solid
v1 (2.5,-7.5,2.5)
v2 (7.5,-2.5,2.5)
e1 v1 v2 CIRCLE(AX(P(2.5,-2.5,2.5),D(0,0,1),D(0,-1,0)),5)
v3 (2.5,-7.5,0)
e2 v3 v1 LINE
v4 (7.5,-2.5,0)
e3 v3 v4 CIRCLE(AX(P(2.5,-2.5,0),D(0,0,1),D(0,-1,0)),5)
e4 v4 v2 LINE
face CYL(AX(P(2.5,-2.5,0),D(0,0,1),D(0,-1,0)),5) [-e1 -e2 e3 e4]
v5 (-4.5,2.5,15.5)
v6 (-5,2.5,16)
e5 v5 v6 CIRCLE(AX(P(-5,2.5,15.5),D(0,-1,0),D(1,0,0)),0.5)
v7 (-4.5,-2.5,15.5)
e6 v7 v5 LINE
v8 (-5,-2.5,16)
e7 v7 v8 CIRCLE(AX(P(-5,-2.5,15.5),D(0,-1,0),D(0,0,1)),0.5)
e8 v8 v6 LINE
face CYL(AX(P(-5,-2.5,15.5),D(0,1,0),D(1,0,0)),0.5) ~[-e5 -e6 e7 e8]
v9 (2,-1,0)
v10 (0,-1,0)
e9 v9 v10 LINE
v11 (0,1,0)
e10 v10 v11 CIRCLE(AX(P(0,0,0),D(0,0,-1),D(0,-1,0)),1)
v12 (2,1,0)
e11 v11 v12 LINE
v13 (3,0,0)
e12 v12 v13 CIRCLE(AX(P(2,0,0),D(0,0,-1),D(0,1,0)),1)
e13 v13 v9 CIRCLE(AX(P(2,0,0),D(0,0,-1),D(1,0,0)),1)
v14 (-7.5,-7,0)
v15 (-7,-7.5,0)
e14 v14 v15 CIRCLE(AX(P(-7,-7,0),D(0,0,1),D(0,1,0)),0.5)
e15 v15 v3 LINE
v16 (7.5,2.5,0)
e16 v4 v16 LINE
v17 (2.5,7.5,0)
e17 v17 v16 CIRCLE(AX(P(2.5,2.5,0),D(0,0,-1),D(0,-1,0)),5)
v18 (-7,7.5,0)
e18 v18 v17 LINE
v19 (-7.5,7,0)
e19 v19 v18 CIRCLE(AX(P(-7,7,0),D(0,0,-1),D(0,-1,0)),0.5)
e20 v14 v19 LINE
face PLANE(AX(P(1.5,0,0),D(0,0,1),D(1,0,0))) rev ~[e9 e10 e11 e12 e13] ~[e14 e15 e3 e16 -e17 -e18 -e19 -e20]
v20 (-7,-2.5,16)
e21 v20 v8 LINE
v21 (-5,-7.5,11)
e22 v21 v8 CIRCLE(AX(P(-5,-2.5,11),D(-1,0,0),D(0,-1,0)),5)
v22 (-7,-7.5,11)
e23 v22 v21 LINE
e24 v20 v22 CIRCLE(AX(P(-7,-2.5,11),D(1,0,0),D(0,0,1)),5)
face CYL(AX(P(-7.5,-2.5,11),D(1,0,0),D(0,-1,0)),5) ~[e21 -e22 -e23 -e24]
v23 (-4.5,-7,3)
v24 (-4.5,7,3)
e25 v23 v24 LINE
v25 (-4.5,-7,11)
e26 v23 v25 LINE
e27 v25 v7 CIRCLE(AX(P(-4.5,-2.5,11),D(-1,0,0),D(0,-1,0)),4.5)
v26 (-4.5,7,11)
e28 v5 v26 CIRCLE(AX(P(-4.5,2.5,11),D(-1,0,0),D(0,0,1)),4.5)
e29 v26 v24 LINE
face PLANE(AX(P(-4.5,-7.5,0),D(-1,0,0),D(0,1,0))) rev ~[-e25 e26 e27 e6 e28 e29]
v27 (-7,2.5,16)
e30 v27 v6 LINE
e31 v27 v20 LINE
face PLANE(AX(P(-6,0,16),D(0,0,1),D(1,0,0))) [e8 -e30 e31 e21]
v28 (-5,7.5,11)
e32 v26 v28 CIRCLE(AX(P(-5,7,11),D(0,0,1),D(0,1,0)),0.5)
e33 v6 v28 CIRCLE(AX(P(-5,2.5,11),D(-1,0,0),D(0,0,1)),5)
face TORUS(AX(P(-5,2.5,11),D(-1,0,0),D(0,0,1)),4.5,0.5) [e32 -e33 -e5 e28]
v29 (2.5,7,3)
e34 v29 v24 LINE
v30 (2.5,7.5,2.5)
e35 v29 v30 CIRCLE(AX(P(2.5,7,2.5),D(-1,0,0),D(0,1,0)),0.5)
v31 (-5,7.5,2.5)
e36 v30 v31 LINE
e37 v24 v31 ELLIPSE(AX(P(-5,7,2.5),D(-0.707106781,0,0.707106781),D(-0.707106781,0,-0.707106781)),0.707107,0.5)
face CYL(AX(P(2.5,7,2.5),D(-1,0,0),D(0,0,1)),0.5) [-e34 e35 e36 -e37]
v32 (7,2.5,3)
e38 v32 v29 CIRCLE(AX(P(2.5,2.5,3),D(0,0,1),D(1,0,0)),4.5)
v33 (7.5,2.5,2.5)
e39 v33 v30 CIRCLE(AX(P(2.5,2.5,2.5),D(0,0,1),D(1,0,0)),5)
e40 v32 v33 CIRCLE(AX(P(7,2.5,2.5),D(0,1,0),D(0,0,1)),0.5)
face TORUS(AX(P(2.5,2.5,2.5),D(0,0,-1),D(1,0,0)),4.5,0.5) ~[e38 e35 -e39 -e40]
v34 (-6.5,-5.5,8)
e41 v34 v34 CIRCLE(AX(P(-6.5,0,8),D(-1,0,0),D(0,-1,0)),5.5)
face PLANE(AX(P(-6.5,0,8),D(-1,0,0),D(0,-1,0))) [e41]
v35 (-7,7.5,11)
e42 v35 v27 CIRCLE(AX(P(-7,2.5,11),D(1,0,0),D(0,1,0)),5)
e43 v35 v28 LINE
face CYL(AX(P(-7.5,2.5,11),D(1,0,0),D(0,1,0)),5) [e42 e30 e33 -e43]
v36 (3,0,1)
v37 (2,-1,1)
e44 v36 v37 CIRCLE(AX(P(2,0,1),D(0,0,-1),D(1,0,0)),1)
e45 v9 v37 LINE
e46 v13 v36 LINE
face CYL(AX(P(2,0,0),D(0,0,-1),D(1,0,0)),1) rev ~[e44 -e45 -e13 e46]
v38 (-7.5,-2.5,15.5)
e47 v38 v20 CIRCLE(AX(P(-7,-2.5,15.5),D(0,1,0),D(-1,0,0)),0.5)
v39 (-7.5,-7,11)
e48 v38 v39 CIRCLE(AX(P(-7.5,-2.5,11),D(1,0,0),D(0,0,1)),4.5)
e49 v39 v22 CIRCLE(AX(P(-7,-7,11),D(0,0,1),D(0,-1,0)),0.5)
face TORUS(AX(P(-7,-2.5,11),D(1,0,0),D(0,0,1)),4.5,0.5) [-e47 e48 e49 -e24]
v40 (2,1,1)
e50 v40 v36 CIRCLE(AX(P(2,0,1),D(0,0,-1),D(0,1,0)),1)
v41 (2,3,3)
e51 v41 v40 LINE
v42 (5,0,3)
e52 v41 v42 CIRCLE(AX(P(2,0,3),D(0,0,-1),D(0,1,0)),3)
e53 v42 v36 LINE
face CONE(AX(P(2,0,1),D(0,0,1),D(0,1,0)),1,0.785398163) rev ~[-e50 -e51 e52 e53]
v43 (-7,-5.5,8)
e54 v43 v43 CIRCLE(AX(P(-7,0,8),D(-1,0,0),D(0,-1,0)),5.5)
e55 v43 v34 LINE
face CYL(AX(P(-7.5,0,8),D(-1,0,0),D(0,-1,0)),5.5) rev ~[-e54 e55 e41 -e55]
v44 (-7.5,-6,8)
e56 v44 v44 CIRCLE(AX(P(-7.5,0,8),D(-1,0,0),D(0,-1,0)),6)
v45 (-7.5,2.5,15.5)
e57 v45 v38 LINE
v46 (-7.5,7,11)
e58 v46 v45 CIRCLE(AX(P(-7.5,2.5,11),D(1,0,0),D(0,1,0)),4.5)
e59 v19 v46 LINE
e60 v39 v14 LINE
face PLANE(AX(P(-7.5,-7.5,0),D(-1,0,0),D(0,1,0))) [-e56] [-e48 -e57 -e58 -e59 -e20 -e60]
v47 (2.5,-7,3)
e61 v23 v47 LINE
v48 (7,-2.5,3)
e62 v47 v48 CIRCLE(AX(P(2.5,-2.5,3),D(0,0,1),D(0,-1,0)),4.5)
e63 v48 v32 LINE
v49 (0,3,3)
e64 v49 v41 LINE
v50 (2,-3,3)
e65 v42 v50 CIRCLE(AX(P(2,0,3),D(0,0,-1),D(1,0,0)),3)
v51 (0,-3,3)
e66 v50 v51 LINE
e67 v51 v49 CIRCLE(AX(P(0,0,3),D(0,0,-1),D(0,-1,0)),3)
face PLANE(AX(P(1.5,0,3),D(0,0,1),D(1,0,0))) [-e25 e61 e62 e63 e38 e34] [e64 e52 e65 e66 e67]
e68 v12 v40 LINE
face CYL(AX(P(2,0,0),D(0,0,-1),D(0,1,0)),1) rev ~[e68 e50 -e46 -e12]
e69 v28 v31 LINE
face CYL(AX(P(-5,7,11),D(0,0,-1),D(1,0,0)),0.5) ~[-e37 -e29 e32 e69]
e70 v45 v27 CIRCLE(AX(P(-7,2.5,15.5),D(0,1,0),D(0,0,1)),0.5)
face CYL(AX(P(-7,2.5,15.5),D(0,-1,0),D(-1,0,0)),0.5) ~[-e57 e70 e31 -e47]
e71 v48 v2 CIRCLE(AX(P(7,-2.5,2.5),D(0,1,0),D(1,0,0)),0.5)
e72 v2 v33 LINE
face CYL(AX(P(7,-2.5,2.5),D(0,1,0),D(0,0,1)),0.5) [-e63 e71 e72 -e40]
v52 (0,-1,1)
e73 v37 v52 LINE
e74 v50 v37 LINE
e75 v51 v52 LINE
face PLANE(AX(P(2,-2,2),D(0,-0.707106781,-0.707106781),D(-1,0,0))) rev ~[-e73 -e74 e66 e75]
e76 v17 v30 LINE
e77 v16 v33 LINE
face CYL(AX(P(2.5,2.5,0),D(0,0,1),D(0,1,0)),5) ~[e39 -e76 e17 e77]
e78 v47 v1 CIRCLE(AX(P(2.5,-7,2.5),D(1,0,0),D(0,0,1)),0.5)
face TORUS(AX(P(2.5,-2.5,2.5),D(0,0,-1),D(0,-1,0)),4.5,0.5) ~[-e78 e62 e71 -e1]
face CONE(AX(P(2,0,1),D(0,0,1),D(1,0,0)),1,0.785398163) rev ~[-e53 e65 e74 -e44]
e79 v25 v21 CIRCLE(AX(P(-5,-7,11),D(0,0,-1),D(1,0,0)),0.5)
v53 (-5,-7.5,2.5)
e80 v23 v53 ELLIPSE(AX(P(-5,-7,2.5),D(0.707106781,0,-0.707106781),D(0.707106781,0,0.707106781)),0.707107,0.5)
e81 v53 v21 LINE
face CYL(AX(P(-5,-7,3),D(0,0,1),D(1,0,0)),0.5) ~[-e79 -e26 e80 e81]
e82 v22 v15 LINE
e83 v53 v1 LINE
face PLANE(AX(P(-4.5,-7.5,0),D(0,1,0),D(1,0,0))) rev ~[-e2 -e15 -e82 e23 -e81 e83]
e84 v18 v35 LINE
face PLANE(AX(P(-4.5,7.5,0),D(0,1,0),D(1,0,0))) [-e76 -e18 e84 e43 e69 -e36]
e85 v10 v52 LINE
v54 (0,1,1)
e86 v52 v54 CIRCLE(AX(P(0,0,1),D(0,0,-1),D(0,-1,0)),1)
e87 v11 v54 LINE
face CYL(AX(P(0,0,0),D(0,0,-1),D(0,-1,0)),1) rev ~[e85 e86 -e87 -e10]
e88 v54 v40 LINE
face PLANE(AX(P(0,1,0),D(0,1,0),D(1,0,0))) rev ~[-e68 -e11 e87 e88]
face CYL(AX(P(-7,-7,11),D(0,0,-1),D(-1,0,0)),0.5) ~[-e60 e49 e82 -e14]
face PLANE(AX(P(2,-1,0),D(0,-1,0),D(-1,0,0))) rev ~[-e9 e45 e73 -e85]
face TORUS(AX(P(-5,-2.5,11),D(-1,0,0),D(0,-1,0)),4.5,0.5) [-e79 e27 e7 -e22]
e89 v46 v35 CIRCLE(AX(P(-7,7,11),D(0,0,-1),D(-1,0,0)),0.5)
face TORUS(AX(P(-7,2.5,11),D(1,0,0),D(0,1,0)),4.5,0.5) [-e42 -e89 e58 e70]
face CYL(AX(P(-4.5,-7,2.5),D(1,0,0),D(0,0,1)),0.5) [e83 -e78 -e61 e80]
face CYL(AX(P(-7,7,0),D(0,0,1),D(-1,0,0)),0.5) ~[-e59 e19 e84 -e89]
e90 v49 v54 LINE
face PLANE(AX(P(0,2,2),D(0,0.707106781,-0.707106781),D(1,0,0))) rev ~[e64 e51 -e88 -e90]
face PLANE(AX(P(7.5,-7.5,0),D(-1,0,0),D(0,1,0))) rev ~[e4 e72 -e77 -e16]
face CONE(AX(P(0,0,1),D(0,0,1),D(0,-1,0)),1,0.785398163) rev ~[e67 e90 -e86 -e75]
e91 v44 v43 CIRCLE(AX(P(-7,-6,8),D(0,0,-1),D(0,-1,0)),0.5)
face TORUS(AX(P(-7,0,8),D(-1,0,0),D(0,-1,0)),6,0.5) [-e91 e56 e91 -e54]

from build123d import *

# Parameters (mm, degrees)
F0_W     = 3
F0_H     = 15
F1_DEPTH = 16
F0_W_2   = 12
F2_DEPTH = 3
F3_R     = 5.5
F4_DEPTH = 1
F5_SIZE  = 2
F6_R     = 5
F7_R     = 0.5


with BuildPart() as f1:
    # F0 (on Top) → F1 (new body)
    with BuildSketch(Plane.XY):
        with Locations((-6, 0)):
            Rectangle(F0_W, F0_H)
    extrude(amount=F1_DEPTH)

    # F0 (on Top) → F2 (join)
    with BuildSketch(Plane.XY):
        with Locations((1.5, 0)):
            Rectangle(F0_W_2, F0_H)
        with BuildLine():
            ThreePointArc((0, -1), (-1, 0), (0, 1))
            Line((0, 1), (2, 1))
            ThreePointArc((2, 1), (2.7071067812, 0.7071067812), (3, 0))
            ThreePointArc((3, 0), (2.7071067812, -0.7071067812), (2, -1))
            Line((2, -1), (0, -1))
        make_face(mode=Mode.SUBTRACT)
    extrude(amount=F2_DEPTH)

    # F3 (on face) → F4 (cut)
    with BuildSketch(Plane(origin=(-7.5, 0, 0), x_dir=(0, -1, 0), z_dir=(-1, 0, 0))):
        with Locations((0, 8)):
            Circle(F3_R)
    extrude(amount=-F4_DEPTH, mode=Mode.SUBTRACT)

    # F5
    f5_edges = [f1.edges().sort_by_distance(p)[0] for p in [
        (-1, 0, 3),
    ]]
    chamfer(f5_edges, length=F5_SIZE)

    # F6
    f6_edges = [f1.edges().sort_by_distance(p)[0] for p in [
        (-6, -7.5, 16),
        (-6, 7.5, 16),
        (7.5, -7.5, 1.5),
        (7.5, 7.5, 1.5),
    ]]
    fillet(f6_edges, radius=F6_R)

    # F7
    f7_edges = [f1.edges().sort_by_distance(p)[0] for p in [
        (-7.5, 5.5, 8),
        (-7.5, 6.035534, 14.535534),
        (-4.5, -6.035534, 14.535534),
        (6.035534, -6.035534, 3),
    ]]
    fillet(f7_edges, radius=F7_R)


solid = f1.part
